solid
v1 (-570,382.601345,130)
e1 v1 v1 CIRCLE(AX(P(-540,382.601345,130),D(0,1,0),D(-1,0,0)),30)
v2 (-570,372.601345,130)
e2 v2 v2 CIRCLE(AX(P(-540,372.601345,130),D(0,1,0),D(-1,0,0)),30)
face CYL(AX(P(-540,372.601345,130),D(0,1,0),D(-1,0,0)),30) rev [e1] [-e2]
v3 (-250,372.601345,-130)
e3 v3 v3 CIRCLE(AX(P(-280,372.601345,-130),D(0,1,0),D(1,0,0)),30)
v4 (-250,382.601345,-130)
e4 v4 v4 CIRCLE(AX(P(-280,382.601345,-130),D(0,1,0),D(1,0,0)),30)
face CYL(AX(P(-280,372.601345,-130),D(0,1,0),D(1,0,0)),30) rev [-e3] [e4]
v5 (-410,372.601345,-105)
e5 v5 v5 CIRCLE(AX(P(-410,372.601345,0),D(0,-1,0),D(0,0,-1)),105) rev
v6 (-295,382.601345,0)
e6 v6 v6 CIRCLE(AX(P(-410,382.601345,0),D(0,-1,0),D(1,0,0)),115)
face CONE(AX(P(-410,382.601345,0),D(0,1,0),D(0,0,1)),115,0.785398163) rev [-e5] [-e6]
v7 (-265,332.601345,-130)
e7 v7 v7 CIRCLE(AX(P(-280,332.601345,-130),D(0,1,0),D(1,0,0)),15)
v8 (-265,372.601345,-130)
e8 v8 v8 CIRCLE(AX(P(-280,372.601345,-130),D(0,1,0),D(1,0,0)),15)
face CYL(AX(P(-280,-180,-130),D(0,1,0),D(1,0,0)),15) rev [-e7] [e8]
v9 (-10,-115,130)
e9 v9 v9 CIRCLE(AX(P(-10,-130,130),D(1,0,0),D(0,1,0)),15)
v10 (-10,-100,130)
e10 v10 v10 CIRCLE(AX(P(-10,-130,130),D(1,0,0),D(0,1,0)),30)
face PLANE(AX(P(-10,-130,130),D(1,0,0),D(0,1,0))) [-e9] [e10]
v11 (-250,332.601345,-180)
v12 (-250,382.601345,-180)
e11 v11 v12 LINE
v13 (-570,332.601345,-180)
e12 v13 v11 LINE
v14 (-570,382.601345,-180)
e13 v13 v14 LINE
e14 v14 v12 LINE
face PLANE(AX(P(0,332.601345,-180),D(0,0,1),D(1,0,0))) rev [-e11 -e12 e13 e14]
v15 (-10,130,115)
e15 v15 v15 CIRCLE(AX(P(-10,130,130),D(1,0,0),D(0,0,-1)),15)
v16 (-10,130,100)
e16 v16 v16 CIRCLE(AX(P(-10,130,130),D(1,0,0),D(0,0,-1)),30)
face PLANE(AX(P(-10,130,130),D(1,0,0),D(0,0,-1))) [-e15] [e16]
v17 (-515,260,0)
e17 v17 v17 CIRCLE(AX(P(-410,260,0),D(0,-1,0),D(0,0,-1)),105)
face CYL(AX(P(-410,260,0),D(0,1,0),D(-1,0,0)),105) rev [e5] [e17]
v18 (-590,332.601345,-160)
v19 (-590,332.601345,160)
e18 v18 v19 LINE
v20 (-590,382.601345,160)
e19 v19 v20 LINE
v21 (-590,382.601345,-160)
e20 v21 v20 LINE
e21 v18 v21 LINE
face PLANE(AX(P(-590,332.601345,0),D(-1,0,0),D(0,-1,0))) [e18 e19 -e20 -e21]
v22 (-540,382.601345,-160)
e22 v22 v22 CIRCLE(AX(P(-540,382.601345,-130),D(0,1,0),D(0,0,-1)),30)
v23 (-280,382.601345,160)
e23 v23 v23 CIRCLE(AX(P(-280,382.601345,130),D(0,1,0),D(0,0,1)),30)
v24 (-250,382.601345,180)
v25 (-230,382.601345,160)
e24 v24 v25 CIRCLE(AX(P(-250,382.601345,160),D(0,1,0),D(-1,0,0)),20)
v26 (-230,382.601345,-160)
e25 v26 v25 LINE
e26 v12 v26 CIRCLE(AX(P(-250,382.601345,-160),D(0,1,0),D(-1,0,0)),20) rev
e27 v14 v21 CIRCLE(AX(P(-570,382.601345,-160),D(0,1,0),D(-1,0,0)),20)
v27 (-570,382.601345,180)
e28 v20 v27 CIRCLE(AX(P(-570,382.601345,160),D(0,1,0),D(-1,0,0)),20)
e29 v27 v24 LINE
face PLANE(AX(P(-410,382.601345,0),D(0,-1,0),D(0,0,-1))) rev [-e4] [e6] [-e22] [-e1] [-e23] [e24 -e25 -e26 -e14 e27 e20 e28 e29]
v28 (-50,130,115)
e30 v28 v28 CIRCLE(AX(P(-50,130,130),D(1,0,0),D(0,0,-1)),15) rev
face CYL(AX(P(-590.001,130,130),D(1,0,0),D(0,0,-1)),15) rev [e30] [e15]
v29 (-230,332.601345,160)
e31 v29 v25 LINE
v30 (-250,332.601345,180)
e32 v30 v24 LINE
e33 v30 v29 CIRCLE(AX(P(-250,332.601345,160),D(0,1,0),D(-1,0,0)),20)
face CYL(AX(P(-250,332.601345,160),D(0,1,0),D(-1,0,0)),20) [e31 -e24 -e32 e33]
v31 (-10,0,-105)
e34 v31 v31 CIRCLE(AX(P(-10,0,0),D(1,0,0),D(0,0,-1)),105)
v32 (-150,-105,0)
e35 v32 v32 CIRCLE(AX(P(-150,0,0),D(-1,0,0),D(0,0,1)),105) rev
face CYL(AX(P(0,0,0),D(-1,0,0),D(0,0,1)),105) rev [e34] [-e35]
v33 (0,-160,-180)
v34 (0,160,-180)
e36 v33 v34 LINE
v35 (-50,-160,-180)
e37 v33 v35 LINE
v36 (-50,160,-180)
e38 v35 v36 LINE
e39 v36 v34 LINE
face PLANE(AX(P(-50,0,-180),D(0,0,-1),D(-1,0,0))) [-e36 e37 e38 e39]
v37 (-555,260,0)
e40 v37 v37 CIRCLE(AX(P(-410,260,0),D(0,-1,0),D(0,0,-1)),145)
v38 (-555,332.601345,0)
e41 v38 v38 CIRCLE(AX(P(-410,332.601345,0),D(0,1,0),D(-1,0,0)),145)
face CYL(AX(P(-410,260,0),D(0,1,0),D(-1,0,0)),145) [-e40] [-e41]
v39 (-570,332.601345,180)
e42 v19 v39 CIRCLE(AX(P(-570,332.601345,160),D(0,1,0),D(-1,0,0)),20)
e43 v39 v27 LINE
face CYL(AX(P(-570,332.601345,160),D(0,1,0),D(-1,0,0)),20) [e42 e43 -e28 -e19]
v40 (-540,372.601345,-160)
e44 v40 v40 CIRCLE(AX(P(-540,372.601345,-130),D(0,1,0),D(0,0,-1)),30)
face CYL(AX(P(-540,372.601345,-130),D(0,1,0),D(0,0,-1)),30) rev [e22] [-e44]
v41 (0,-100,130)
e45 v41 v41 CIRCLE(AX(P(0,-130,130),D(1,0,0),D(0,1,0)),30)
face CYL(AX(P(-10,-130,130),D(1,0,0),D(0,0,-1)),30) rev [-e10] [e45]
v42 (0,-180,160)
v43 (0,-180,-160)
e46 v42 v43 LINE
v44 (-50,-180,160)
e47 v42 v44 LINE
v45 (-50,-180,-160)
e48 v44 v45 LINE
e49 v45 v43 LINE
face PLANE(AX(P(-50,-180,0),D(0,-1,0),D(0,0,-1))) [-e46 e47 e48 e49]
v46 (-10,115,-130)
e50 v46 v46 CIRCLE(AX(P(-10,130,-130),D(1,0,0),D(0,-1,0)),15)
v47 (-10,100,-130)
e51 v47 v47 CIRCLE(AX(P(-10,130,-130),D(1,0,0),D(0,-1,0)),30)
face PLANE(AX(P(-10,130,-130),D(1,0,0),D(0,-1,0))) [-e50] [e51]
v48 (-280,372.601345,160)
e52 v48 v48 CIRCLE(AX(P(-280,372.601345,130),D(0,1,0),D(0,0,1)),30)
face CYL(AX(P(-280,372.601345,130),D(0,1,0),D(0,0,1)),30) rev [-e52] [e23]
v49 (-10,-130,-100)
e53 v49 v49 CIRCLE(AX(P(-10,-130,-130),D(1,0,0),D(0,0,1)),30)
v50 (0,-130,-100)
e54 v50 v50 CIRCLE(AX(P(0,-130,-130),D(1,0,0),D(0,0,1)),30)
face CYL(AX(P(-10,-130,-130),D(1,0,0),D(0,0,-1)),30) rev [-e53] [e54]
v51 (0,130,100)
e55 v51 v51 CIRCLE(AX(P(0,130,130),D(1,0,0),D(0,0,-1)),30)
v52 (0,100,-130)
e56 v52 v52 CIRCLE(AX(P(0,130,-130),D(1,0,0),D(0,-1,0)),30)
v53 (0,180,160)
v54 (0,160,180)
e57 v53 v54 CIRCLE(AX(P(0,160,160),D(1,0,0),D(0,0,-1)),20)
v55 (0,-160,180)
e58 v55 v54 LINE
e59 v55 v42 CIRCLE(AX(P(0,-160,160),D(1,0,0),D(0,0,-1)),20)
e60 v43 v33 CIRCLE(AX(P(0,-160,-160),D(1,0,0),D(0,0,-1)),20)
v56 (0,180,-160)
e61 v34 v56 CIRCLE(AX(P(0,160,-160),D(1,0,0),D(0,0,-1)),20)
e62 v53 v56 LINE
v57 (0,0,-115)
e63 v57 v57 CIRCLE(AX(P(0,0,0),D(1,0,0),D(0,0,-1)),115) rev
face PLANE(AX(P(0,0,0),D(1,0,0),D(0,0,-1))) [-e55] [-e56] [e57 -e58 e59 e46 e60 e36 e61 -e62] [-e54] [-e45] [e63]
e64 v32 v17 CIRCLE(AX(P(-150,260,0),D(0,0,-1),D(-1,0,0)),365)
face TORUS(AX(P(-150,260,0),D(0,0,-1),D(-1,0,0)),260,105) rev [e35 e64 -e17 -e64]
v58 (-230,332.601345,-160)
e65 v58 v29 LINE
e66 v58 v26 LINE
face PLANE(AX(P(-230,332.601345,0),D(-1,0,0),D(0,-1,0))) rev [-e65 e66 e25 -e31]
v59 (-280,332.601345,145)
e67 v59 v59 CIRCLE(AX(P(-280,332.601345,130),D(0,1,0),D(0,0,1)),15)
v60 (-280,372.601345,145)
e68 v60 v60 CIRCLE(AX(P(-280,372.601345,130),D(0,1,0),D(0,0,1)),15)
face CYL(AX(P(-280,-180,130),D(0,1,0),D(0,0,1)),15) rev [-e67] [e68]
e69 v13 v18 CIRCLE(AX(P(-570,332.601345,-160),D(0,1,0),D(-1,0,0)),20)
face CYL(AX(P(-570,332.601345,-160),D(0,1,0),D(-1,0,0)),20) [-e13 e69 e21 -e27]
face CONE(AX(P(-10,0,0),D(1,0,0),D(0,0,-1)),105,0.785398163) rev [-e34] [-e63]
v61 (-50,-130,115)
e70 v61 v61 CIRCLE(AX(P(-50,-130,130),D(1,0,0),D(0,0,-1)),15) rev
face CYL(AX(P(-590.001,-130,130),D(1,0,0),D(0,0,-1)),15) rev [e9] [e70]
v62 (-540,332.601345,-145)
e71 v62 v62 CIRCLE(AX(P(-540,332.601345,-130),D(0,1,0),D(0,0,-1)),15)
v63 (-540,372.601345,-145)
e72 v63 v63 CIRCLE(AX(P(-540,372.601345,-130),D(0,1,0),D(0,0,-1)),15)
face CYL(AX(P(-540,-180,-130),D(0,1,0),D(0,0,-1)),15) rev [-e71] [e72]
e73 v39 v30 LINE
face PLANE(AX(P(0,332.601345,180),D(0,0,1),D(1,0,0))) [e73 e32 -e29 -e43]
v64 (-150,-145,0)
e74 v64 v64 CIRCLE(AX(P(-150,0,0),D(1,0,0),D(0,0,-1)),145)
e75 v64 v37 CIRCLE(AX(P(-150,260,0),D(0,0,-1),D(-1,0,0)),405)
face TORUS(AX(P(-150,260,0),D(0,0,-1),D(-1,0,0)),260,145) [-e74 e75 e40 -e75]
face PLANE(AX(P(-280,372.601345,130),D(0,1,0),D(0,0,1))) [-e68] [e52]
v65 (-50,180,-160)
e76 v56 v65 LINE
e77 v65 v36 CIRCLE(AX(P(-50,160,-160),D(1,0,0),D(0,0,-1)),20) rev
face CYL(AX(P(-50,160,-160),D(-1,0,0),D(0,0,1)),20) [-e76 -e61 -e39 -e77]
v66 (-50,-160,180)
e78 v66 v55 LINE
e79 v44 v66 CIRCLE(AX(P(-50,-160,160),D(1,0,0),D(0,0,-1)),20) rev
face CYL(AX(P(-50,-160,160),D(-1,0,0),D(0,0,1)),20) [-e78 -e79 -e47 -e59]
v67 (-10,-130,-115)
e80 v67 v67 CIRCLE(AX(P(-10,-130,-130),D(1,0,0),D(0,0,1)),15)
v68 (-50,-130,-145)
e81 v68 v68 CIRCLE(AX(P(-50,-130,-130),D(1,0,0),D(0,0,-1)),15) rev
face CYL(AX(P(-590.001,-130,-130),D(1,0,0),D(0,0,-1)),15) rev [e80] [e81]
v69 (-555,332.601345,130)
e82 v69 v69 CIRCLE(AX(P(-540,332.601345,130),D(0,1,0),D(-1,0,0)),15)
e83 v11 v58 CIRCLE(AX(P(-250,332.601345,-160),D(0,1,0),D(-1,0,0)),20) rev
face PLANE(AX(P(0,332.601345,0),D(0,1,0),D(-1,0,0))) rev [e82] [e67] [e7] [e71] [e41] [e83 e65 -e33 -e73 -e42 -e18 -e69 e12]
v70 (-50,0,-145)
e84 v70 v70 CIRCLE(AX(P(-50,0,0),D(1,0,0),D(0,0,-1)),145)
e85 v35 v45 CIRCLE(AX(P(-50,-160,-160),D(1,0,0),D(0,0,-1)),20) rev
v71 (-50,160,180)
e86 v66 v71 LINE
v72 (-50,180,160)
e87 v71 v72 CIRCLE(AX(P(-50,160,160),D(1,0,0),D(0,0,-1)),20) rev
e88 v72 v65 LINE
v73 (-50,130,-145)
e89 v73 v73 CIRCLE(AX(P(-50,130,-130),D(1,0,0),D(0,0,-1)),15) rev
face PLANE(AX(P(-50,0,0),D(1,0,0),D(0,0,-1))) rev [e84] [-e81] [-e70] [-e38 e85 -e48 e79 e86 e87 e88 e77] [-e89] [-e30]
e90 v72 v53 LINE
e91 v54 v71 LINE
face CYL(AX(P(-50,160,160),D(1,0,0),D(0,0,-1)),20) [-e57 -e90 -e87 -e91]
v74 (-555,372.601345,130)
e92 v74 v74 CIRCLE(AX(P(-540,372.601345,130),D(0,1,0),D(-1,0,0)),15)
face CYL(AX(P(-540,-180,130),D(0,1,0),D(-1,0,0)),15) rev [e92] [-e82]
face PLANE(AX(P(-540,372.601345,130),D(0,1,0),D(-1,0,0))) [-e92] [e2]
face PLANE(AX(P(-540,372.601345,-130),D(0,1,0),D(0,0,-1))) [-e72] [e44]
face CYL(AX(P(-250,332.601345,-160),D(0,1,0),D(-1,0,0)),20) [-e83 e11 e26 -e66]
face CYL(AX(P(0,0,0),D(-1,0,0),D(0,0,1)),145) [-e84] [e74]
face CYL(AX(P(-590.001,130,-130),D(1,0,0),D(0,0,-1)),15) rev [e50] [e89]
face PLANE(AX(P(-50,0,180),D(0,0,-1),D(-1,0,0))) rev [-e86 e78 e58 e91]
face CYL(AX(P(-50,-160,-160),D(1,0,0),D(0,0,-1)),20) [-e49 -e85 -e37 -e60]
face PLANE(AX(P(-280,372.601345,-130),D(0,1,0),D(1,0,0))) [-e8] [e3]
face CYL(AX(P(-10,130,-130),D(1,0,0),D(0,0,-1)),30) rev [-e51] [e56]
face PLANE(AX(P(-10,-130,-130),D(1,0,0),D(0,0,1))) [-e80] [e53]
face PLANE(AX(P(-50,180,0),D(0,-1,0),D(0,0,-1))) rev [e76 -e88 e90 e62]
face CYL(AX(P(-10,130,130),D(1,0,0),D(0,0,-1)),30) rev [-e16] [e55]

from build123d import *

# Parameters (mm, degrees)
SKETCH2_R                 = 145
SKETCH2_R_2               = 105
BOSS_EXTRUDE1_START       = -50
SKETCH3_W                 = 360
SKETCH3_H                 = 360
SKETCH3_R                 = 145
BOSS_EXTRUDE1_DEPTH       = 50
FILLET1_R                 = 20
SKETCH4_R                 = 145
BOSS_EXTRUDE2_DEPTH       = 50
SKETCH5_R                 = 30
CUT_EXTRUDE2_DEPTH        = 10
CUT_EXTRUDE3_REACH        = 719.763
SKETCH6_R                 = 15
CIRPATTERN1_COUNT         = 4
SKETCH7_R                 = 30
CUT_EXTRUDE4_DEPTH        = 10
SKETCH8_R                 = 15
CUT_EXTRUDE5_DEPTH        = 829.171628686
CIRPATTERN4_START         = 332.601345058
CIRPATTERN4_OUTLINE_R     = 15
CIRPATTERN4_DEPTH         = 50
CIRPATTERN4_START_2       = 372.601345058
CIRPATTERN4_2_OUTLINE_R   = 30
CIRPATTERN4_2_OUTLINE_R_2 = 15
CIRPATTERN4_2_DEPTH       = 10
CHAMFER1_SIZE             = 10


# Read off the part's stored shape, not the designer's step: CirPattern4
with BuildPart() as part:
    # Sweep-Thin1: sweep along a path in Sketch1
    with BuildLine(Plane.XY) as sweep_thin1_path:
        Line((0, 0), (-150, 0))
        ThreePointArc((-150, 0), (-333.847763109, 76.152236891), (-410, 260))
        Line((-410, 260), (-410, 382.601345058))
    # Sketch2 → Sweep-Thin1 (sweep)
    with BuildSketch(Plane(origin=(0, 0, 0), x_dir=(0, 0, -1), z_dir=(1, 0, 0))):
        Circle(SKETCH2_R)
        Circle(SKETCH2_R_2, mode=Mode.SUBTRACT)
    sweep(path=sweep_thin1_path.line)

    # Sketch3 → Boss-Extrude1 (add)
    with BuildSketch(Plane(origin=(0, 0, 0), x_dir=(0, 0, -1), z_dir=(1, 0, 0)).offset(BOSS_EXTRUDE1_START)):
        Rectangle(SKETCH3_W, SKETCH3_H)
        with Locations(Location((0, 0, 0), (0, 0, 270))):
            Circle(SKETCH3_R, mode=Mode.SUBTRACT)
    extrude(amount=BOSS_EXTRUDE1_DEPTH)

    # Fillet1
    fillet1_edges = [part.edges().sort_by_distance(p)[0] for p in [
        (-25, -180, -180),
        (-25, -180, 180),
        (-25, 180, 180),
        (-25, 180, -180),
    ]]
    fillet(fillet1_edges, radius=FILLET1_R)

    # Sketch4 → Boss-Extrude2 (add)
    with BuildSketch(Plane(origin=(0, 382.601345058, 0), x_dir=(1, 0, 0), z_dir=(0, 1, 0))):
        with BuildLine():
            Line((-570, -180), (-250, -180))
            ThreePointArc((-250, -180), (-235.857864376, -174.142135624), (-230, -160))
            Line((-230, -160), (-230, 160))
            ThreePointArc((-230, 160), (-235.857864376, 174.142135624), (-250, 180))
            Line((-250, 180), (-570, 180))
            ThreePointArc((-570, 180), (-584.142135624, 174.142135624), (-590, 160))
            Line((-590, 160), (-590, -160))
            ThreePointArc((-590, -160), (-584.142135624, -174.142135624), (-570, -180))
        make_face()
        with Locations(Location((-410, 0, 0), (0, 0, 180))):
            Circle(SKETCH4_R, mode=Mode.SUBTRACT)
    extrude(amount=-BOSS_EXTRUDE2_DEPTH)

    # Sketch5 → Cut-Extrude2 (cut)
    with BuildSketch(Plane(origin=(0, 0, 0), x_dir=(0, 0, -1), z_dir=(1, 0, 0))):
        with Locations((-130, 130)):
            Circle(SKETCH5_R)
    cut_extrude2 = extrude(amount=-CUT_EXTRUDE2_DEPTH, mode=Mode.SUBTRACT)

    # Sketch6 → Cut-Extrude3 (cut, up to next)
    with BuildSketch(Plane(origin=(-10, 0, 0), x_dir=(0, 0, -1), z_dir=(1, 0, 0)), mode=Mode.PRIVATE) as cut_extrude3_sk1:
        with Locations((-130, 130)):
            Circle(SKETCH6_R)
    cut_extrude3_tool1 = extrude(cut_extrude3_sk1.sketch, amount=-CUT_EXTRUDE3_REACH, mode=Mode.PRIVATE) & part.part
    cut_extrude3 = cut_extrude3_tool1.solids().sort_by_distance((-10, 130, 130))[0]
    add(cut_extrude3, mode=Mode.SUBTRACT)

    # CirPattern1: Cut-Extrude2, Cut-Extrude3 ×4 about axis
    cirpattern1_axis = Axis((0, 0, 0), (1, 0, 0))
    add([cut_extrude2.rotate(cirpattern1_axis, i * 360 / CIRPATTERN1_COUNT) for i in range(1, CIRPATTERN1_COUNT)], mode=Mode.SUBTRACT)
    add([cut_extrude3.rotate(cirpattern1_axis, i * 360 / CIRPATTERN1_COUNT) for i in range(1, CIRPATTERN1_COUNT)], mode=Mode.SUBTRACT)

    # Sketch7 → Cut-Extrude4 (cut)
    with BuildSketch(Plane(origin=(0, 382.601345058, 0), x_dir=(1, 0, 0), z_dir=(0, 1, 0))):
        with Locations(Location((-540, -130, 0), (0, 0, 180))):
            Circle(SKETCH7_R)
    extrude(amount=-CUT_EXTRUDE4_DEPTH, mode=Mode.SUBTRACT)

    # Sketch8 → Cut-Extrude5 (cut, through all)
    with BuildSketch(Plane(origin=(0, 372.601345058, 0), x_dir=(1, 0, 0), z_dir=(0, 1, 0))):
        with Locations(Location((-540, -130, 0), (0, 0, 180))):
            Circle(SKETCH8_R)
    extrude(amount=-CUT_EXTRUDE5_DEPTH, mode=Mode.SUBTRACT)

    # CirPattern4 outline → CirPattern4 (cut)
    with BuildSketch(Plane(origin=(0, 0, 0), x_dir=(1, 0, 0), z_dir=(0, 1, 0)).offset(CIRPATTERN4_START)):
        with Locations((-280, -130)):
            Circle(CIRPATTERN4_OUTLINE_R)
        with Locations((-280, 130)):
            Circle(CIRPATTERN4_OUTLINE_R)
        with Locations((-540, 130)):
            Circle(CIRPATTERN4_OUTLINE_R)
    extrude(amount=CIRPATTERN4_DEPTH, mode=Mode.SUBTRACT)

    # CirPattern4 2 outline → CirPattern4 2 (cut)
    # profile 1 of 3: a face of its own
    with BuildSketch(Plane(origin=(0, 0, 0), x_dir=(1, 0, 0), z_dir=(0, 1, 0)).offset(CIRPATTERN4_START_2)):
        with Locations((-280, -130)):
            Circle(CIRPATTERN4_2_OUTLINE_R)
        with Locations((-280, -130)):
            Circle(CIRPATTERN4_2_OUTLINE_R_2, mode=Mode.SUBTRACT)
    # profile 2 of 3: a face of its own
    with BuildSketch(Plane(origin=(0, 0, 0), x_dir=(1, 0, 0), z_dir=(0, 1, 0)).offset(CIRPATTERN4_START_2)):
        with Locations((-280, 130)):
            Circle(CIRPATTERN4_2_OUTLINE_R)
        with Locations((-280, 130)):
            Circle(CIRPATTERN4_2_OUTLINE_R_2, mode=Mode.SUBTRACT)
    # profile 3 of 3: a face of its own
    with BuildSketch(Plane(origin=(0, 0, 0), x_dir=(1, 0, 0), z_dir=(0, 1, 0)).offset(CIRPATTERN4_START_2)):
        with Locations((-540, 130)):
            Circle(CIRPATTERN4_2_OUTLINE_R)
        with Locations((-540, 130)):
            Circle(CIRPATTERN4_2_OUTLINE_R_2, mode=Mode.SUBTRACT)
    extrude(amount=CIRPATTERN4_2_DEPTH, mode=Mode.SUBTRACT)

    # Chamfer1
    chamfer1_edges = [part.edges().sort_by_distance(p)[0] for p in [
        (0, 0, 105),
        (-410, 382.601345058, 105),
    ]]
    chamfer(chamfer1_edges, length=CHAMFER1_SIZE)


solid = part.part
